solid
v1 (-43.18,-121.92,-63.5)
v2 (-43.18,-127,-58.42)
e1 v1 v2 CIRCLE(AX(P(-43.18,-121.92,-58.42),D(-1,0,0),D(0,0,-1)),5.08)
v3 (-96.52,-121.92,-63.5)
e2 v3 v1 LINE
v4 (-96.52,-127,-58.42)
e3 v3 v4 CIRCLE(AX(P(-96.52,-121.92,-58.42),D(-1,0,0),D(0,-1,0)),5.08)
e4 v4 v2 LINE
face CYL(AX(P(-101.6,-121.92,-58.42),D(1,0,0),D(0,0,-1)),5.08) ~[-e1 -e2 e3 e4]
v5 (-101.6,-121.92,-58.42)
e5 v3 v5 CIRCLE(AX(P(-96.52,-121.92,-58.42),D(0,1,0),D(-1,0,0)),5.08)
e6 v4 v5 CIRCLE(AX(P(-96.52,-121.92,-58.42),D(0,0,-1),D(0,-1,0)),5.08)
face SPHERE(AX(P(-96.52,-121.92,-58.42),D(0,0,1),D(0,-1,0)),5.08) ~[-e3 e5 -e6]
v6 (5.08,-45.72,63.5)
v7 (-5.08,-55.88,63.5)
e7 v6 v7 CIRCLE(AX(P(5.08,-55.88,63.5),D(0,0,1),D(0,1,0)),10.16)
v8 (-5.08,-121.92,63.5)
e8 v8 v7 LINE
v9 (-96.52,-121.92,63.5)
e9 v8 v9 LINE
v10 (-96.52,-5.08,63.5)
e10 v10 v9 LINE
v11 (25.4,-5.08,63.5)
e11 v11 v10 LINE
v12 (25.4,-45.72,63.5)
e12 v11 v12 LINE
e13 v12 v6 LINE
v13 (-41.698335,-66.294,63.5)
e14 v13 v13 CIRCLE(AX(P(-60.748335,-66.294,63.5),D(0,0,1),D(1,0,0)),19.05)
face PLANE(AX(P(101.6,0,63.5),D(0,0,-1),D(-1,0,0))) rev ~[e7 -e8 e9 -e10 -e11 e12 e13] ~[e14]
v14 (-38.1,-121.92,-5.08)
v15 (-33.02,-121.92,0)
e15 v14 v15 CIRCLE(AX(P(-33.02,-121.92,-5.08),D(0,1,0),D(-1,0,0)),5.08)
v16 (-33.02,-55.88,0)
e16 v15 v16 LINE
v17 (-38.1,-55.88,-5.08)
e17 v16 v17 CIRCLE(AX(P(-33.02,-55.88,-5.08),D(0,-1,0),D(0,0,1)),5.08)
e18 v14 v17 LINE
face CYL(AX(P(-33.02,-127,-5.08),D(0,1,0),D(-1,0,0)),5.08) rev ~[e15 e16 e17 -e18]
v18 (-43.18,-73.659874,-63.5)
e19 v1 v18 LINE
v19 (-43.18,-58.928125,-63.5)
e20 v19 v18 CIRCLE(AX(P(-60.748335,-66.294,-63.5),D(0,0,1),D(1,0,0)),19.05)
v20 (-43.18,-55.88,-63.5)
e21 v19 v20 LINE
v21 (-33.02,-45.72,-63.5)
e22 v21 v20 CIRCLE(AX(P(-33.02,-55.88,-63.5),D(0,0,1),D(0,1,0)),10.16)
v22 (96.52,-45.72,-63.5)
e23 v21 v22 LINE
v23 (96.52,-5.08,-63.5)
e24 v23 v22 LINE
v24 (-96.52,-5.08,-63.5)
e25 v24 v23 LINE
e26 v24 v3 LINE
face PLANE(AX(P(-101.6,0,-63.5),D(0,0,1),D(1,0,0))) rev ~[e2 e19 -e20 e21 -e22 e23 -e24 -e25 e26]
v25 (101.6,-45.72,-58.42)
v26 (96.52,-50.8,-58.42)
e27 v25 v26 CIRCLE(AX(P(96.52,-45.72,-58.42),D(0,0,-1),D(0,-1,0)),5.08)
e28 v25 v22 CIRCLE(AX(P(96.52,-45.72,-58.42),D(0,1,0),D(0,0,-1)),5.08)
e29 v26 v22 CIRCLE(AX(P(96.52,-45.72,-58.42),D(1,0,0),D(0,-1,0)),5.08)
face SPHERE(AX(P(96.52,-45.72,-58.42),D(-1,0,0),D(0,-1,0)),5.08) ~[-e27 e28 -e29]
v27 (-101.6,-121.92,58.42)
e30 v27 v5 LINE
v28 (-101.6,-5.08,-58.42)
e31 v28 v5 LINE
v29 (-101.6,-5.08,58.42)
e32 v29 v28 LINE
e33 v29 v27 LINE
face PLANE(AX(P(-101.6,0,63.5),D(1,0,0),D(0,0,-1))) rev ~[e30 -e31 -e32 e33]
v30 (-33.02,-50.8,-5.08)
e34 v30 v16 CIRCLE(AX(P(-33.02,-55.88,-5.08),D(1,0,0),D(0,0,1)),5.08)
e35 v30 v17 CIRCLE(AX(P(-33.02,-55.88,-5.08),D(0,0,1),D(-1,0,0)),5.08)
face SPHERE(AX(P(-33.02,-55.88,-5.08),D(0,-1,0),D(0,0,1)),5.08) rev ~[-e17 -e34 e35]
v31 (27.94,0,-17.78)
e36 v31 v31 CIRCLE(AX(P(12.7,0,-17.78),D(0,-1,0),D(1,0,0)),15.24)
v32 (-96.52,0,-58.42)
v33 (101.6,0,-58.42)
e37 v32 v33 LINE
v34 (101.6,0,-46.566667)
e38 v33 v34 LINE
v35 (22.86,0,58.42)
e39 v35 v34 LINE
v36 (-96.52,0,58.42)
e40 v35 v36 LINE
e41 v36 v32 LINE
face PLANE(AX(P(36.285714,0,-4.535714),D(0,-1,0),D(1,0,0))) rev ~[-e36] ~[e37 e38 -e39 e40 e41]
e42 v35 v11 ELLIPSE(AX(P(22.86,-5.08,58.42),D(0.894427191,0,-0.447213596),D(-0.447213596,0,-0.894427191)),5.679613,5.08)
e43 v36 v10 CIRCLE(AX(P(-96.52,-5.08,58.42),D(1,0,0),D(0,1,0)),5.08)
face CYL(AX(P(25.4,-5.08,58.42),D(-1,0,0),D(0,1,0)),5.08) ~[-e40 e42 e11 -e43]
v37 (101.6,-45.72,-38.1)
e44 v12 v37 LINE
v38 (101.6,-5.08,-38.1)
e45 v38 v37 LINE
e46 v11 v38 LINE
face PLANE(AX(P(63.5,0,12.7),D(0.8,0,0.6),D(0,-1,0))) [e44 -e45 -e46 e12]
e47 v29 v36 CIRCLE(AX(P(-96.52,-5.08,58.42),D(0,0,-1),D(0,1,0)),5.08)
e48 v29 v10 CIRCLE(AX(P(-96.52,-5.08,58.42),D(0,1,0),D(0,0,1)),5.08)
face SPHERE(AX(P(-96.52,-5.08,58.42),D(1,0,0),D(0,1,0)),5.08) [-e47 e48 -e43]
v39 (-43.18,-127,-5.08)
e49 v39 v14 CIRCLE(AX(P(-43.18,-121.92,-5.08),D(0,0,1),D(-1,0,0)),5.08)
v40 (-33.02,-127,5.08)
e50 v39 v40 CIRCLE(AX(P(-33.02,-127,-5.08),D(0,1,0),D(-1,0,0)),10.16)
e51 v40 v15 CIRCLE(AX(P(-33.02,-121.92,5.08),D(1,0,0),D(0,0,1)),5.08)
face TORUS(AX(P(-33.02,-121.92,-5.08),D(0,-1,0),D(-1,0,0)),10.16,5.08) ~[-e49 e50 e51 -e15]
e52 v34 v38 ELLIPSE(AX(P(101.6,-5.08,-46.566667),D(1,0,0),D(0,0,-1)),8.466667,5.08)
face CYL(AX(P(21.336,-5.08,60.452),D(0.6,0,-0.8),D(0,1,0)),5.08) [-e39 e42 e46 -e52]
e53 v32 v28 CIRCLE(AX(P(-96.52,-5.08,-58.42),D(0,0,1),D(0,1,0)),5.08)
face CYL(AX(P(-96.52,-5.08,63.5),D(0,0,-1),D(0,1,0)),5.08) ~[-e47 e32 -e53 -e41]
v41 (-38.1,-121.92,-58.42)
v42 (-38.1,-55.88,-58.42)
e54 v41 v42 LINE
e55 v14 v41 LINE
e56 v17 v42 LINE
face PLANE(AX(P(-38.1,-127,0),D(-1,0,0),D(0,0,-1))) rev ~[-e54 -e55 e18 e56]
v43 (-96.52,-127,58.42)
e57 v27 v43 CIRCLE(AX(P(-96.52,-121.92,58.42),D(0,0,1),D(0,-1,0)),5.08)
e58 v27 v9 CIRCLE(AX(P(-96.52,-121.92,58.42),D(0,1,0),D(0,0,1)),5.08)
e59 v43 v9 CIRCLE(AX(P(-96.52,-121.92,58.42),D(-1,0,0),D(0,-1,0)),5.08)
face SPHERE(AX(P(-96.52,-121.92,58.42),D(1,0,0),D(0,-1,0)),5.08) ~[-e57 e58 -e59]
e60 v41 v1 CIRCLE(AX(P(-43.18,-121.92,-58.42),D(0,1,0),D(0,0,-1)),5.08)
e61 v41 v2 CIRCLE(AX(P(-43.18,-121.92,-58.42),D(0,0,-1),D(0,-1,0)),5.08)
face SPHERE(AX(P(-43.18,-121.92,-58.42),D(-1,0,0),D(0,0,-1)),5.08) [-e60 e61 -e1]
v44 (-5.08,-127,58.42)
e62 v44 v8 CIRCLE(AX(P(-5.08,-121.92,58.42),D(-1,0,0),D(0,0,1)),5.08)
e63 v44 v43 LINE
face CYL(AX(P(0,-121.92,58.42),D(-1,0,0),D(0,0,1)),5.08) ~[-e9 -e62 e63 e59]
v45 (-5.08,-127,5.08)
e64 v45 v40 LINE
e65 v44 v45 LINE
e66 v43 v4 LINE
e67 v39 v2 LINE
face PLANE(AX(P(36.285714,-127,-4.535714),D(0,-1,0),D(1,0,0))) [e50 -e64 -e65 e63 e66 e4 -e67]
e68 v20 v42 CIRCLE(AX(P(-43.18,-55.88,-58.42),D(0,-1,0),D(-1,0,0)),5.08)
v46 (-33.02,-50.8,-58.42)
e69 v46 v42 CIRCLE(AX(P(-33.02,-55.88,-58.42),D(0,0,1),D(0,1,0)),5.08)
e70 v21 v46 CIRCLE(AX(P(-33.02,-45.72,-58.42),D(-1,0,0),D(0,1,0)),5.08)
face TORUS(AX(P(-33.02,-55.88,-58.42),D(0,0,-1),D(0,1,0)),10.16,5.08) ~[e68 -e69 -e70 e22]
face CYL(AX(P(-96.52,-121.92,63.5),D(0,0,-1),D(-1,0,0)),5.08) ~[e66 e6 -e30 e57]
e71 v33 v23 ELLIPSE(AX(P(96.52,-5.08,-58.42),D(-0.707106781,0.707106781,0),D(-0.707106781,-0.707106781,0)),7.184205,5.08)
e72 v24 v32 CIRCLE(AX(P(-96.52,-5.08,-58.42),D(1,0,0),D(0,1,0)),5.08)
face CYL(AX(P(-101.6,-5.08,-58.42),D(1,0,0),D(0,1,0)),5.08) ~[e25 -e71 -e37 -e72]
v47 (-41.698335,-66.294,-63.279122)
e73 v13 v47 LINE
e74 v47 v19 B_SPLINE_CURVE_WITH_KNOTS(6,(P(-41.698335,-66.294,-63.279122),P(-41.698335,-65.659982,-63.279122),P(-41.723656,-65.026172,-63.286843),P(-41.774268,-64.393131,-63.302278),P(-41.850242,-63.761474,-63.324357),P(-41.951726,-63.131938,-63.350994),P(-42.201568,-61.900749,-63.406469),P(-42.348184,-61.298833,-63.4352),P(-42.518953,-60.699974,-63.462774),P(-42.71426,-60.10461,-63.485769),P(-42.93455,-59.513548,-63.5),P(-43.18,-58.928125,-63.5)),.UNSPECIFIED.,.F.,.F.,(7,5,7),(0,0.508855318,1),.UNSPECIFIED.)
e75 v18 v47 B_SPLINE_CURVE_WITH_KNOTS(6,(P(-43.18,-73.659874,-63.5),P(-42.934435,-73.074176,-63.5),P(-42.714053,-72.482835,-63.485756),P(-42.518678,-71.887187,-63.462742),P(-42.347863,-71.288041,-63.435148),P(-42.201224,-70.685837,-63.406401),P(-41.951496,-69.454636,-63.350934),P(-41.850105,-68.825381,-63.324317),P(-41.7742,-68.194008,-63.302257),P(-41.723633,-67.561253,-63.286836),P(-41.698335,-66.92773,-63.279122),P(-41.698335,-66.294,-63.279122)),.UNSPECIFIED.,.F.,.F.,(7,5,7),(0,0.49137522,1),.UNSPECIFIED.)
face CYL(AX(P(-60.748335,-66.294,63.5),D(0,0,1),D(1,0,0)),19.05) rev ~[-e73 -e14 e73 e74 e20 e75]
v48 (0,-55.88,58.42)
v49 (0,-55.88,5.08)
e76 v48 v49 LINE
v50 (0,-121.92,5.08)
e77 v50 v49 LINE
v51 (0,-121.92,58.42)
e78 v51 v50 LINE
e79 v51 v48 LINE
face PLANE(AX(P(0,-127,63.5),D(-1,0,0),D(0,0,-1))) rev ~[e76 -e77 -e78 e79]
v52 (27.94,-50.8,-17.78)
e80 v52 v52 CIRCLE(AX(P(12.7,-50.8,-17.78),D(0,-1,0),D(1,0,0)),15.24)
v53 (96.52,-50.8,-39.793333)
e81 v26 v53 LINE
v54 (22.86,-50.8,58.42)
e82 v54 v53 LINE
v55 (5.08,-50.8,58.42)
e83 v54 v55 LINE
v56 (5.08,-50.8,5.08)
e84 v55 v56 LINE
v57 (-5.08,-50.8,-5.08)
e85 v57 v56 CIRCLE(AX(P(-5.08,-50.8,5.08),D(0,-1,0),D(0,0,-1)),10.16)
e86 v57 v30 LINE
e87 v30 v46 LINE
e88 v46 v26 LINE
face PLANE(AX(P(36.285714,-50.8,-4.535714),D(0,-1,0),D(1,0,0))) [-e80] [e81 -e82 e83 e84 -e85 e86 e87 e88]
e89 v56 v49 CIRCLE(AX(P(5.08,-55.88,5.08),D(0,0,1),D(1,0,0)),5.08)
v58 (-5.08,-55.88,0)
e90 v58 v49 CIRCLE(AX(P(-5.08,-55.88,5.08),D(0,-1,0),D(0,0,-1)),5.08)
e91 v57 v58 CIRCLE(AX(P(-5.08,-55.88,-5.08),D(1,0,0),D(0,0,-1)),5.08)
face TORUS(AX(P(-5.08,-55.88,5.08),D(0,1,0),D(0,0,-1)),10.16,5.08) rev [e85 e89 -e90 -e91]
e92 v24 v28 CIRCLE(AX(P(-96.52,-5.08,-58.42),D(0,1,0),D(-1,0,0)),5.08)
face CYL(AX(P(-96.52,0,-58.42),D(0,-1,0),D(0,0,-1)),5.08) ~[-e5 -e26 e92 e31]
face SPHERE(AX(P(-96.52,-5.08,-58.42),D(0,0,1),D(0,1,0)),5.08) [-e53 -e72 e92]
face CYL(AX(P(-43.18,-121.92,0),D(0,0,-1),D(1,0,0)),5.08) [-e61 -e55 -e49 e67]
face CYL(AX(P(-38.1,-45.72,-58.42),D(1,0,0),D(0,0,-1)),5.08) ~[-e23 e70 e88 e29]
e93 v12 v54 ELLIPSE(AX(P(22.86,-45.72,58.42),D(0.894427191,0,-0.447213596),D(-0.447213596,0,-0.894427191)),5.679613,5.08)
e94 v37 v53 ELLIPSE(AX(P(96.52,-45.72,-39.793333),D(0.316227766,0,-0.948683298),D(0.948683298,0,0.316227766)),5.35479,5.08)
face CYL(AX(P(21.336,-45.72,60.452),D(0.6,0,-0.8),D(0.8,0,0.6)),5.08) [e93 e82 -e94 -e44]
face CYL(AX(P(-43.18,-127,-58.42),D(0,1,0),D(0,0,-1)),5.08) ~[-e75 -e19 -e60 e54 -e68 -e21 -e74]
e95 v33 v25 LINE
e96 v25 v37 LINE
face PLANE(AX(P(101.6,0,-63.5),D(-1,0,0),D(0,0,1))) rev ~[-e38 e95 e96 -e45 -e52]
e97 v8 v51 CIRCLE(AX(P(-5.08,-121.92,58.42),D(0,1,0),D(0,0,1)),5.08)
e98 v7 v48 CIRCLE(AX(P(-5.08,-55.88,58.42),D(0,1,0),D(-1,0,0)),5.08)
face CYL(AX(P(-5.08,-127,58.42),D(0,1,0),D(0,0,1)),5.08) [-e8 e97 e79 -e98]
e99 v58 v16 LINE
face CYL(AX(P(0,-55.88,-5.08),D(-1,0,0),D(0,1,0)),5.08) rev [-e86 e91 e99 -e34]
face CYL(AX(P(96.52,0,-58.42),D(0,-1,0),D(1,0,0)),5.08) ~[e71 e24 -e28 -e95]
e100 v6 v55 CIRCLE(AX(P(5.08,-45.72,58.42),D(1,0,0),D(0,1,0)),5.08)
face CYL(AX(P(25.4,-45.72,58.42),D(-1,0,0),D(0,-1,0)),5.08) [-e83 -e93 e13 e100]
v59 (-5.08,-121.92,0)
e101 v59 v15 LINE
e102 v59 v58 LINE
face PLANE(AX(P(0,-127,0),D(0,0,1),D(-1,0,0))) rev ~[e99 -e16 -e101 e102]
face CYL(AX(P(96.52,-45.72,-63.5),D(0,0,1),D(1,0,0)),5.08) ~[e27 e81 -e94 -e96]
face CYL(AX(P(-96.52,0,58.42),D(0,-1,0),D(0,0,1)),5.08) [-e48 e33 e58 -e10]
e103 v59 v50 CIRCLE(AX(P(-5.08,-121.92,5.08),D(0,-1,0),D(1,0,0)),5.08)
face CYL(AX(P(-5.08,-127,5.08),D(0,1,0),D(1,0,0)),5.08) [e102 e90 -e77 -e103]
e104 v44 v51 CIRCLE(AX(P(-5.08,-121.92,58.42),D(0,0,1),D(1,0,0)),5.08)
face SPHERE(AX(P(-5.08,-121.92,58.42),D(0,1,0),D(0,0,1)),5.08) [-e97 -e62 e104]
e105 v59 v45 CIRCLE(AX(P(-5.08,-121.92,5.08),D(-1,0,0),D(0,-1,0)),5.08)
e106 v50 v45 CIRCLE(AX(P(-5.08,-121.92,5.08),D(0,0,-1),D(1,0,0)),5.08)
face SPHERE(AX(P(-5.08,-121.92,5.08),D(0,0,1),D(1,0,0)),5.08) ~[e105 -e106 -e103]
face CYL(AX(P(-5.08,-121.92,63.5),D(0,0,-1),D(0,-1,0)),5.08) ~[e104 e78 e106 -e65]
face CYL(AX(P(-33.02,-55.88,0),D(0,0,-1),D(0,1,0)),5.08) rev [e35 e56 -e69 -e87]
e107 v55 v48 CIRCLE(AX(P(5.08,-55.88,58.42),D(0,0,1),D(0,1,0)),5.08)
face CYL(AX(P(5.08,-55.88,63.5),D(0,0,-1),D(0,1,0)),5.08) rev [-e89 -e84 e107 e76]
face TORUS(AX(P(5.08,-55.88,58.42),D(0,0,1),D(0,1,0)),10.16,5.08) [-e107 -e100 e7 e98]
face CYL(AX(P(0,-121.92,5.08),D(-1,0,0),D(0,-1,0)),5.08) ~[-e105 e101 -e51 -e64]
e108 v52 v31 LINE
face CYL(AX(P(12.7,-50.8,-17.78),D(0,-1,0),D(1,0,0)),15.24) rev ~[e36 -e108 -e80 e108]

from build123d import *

# Parameters (mm, degrees)
F1_DEPTH = 127
F3_DEPTH = 76.2
F4_SIZE2 = 101.6
F4_SIZE  = 76.2
F5_R     = 5.08
F6_R     = 15.24
F7_DEPTH = 50.8
F8_R     = 19.05
F9_DEPTH = 127


with BuildPart() as f1:
    # F0 (on Front) → F1 (new body)
    with BuildSketch(Plane.XZ):
        Polygon((101.6, -63.5), (101.6, 63.5), (0, 63.5), (0, 0), (-38.1, 0), (-38.1, -63.5), align=None)
        Polygon((0, 0), (0, 63.5), (-101.6, 63.5), (-101.6, -63.5), (-38.1, -63.5), (-38.1, 0), align=None)
    extrude(amount=F1_DEPTH)

    # F2 (on face) → F3 (cut)
    with BuildSketch(Plane.XZ.offset(127)):
        Polygon((-38.1, 0), (-38.1, -63.5), (101.6, -63.5), (101.6, 63.5), (0, 63.5), (0, 0), align=None)
    extrude(amount=-F3_DEPTH, mode=Mode.SUBTRACT)

    # F4
    f4_edges = [f1.edges().sort_by_distance(p)[0] for p in [
        (101.6, -25.4, 63.5),
    ]]
    f4_side = f1.faces().sort_by_distance((-21.771429, -52.614286, 63.5))[0]
    chamfer(f4_edges, length=F4_SIZE, length2=F4_SIZE2, reference=f4_side)

    # F5
    f5_edges = [f1.edges().sort_by_distance(p)[0] for p in [
        (63.5, -50.8, 12.7),
        (63.5, 0, 12.7),
        (12.7, -50.8, 63.5),
        (0, -88.9, 63.5),
        (-50.8, -127, 63.5),
        (0, -127, 31.75),
        (0, -88.9, 0),
        (31.75, -50.8, -63.5),
        (101.6, -50.8, -50.8),
        (101.6, -25.4, -63.5),
        (-101.6, -127, 0),
        (-69.85, -127, -63.5),
        (-38.1, 0, 63.5),
        (-101.6, 0, 0),
        (0, 0, -63.5),
        (-101.6, -63.5, -63.5),
        (-38.1, -88.9, -63.5),
        (-101.6, -63.5, 63.5),
        (-38.1, -127, -31.75),
        (-19.05, -127, 0),
        (-38.1, -88.9, 0),
        (-19.05, -50.8, 0),
        (-38.1, -50.8, -31.75),
        (0, -50.8, 31.75),
    ]]
    fillet(f5_edges, radius=F5_R)

    # F6 (on face) → F7 (cut, through all)
    with BuildSketch(Plane.XZ.offset(50.8)):
        with Locations((12.7, -17.78)):
            Circle(F6_R)
    extrude(amount=-F7_DEPTH, mode=Mode.SUBTRACT)

    # F8 (on face) → F9 (cut, through all)
    with BuildSketch(Plane.XY.offset(63.5)):
        with Locations((-60.7483349741, -66.2939995527)):
            Circle(F8_R)
    extrude(amount=-F9_DEPTH, mode=Mode.SUBTRACT)


solid = f1.part
